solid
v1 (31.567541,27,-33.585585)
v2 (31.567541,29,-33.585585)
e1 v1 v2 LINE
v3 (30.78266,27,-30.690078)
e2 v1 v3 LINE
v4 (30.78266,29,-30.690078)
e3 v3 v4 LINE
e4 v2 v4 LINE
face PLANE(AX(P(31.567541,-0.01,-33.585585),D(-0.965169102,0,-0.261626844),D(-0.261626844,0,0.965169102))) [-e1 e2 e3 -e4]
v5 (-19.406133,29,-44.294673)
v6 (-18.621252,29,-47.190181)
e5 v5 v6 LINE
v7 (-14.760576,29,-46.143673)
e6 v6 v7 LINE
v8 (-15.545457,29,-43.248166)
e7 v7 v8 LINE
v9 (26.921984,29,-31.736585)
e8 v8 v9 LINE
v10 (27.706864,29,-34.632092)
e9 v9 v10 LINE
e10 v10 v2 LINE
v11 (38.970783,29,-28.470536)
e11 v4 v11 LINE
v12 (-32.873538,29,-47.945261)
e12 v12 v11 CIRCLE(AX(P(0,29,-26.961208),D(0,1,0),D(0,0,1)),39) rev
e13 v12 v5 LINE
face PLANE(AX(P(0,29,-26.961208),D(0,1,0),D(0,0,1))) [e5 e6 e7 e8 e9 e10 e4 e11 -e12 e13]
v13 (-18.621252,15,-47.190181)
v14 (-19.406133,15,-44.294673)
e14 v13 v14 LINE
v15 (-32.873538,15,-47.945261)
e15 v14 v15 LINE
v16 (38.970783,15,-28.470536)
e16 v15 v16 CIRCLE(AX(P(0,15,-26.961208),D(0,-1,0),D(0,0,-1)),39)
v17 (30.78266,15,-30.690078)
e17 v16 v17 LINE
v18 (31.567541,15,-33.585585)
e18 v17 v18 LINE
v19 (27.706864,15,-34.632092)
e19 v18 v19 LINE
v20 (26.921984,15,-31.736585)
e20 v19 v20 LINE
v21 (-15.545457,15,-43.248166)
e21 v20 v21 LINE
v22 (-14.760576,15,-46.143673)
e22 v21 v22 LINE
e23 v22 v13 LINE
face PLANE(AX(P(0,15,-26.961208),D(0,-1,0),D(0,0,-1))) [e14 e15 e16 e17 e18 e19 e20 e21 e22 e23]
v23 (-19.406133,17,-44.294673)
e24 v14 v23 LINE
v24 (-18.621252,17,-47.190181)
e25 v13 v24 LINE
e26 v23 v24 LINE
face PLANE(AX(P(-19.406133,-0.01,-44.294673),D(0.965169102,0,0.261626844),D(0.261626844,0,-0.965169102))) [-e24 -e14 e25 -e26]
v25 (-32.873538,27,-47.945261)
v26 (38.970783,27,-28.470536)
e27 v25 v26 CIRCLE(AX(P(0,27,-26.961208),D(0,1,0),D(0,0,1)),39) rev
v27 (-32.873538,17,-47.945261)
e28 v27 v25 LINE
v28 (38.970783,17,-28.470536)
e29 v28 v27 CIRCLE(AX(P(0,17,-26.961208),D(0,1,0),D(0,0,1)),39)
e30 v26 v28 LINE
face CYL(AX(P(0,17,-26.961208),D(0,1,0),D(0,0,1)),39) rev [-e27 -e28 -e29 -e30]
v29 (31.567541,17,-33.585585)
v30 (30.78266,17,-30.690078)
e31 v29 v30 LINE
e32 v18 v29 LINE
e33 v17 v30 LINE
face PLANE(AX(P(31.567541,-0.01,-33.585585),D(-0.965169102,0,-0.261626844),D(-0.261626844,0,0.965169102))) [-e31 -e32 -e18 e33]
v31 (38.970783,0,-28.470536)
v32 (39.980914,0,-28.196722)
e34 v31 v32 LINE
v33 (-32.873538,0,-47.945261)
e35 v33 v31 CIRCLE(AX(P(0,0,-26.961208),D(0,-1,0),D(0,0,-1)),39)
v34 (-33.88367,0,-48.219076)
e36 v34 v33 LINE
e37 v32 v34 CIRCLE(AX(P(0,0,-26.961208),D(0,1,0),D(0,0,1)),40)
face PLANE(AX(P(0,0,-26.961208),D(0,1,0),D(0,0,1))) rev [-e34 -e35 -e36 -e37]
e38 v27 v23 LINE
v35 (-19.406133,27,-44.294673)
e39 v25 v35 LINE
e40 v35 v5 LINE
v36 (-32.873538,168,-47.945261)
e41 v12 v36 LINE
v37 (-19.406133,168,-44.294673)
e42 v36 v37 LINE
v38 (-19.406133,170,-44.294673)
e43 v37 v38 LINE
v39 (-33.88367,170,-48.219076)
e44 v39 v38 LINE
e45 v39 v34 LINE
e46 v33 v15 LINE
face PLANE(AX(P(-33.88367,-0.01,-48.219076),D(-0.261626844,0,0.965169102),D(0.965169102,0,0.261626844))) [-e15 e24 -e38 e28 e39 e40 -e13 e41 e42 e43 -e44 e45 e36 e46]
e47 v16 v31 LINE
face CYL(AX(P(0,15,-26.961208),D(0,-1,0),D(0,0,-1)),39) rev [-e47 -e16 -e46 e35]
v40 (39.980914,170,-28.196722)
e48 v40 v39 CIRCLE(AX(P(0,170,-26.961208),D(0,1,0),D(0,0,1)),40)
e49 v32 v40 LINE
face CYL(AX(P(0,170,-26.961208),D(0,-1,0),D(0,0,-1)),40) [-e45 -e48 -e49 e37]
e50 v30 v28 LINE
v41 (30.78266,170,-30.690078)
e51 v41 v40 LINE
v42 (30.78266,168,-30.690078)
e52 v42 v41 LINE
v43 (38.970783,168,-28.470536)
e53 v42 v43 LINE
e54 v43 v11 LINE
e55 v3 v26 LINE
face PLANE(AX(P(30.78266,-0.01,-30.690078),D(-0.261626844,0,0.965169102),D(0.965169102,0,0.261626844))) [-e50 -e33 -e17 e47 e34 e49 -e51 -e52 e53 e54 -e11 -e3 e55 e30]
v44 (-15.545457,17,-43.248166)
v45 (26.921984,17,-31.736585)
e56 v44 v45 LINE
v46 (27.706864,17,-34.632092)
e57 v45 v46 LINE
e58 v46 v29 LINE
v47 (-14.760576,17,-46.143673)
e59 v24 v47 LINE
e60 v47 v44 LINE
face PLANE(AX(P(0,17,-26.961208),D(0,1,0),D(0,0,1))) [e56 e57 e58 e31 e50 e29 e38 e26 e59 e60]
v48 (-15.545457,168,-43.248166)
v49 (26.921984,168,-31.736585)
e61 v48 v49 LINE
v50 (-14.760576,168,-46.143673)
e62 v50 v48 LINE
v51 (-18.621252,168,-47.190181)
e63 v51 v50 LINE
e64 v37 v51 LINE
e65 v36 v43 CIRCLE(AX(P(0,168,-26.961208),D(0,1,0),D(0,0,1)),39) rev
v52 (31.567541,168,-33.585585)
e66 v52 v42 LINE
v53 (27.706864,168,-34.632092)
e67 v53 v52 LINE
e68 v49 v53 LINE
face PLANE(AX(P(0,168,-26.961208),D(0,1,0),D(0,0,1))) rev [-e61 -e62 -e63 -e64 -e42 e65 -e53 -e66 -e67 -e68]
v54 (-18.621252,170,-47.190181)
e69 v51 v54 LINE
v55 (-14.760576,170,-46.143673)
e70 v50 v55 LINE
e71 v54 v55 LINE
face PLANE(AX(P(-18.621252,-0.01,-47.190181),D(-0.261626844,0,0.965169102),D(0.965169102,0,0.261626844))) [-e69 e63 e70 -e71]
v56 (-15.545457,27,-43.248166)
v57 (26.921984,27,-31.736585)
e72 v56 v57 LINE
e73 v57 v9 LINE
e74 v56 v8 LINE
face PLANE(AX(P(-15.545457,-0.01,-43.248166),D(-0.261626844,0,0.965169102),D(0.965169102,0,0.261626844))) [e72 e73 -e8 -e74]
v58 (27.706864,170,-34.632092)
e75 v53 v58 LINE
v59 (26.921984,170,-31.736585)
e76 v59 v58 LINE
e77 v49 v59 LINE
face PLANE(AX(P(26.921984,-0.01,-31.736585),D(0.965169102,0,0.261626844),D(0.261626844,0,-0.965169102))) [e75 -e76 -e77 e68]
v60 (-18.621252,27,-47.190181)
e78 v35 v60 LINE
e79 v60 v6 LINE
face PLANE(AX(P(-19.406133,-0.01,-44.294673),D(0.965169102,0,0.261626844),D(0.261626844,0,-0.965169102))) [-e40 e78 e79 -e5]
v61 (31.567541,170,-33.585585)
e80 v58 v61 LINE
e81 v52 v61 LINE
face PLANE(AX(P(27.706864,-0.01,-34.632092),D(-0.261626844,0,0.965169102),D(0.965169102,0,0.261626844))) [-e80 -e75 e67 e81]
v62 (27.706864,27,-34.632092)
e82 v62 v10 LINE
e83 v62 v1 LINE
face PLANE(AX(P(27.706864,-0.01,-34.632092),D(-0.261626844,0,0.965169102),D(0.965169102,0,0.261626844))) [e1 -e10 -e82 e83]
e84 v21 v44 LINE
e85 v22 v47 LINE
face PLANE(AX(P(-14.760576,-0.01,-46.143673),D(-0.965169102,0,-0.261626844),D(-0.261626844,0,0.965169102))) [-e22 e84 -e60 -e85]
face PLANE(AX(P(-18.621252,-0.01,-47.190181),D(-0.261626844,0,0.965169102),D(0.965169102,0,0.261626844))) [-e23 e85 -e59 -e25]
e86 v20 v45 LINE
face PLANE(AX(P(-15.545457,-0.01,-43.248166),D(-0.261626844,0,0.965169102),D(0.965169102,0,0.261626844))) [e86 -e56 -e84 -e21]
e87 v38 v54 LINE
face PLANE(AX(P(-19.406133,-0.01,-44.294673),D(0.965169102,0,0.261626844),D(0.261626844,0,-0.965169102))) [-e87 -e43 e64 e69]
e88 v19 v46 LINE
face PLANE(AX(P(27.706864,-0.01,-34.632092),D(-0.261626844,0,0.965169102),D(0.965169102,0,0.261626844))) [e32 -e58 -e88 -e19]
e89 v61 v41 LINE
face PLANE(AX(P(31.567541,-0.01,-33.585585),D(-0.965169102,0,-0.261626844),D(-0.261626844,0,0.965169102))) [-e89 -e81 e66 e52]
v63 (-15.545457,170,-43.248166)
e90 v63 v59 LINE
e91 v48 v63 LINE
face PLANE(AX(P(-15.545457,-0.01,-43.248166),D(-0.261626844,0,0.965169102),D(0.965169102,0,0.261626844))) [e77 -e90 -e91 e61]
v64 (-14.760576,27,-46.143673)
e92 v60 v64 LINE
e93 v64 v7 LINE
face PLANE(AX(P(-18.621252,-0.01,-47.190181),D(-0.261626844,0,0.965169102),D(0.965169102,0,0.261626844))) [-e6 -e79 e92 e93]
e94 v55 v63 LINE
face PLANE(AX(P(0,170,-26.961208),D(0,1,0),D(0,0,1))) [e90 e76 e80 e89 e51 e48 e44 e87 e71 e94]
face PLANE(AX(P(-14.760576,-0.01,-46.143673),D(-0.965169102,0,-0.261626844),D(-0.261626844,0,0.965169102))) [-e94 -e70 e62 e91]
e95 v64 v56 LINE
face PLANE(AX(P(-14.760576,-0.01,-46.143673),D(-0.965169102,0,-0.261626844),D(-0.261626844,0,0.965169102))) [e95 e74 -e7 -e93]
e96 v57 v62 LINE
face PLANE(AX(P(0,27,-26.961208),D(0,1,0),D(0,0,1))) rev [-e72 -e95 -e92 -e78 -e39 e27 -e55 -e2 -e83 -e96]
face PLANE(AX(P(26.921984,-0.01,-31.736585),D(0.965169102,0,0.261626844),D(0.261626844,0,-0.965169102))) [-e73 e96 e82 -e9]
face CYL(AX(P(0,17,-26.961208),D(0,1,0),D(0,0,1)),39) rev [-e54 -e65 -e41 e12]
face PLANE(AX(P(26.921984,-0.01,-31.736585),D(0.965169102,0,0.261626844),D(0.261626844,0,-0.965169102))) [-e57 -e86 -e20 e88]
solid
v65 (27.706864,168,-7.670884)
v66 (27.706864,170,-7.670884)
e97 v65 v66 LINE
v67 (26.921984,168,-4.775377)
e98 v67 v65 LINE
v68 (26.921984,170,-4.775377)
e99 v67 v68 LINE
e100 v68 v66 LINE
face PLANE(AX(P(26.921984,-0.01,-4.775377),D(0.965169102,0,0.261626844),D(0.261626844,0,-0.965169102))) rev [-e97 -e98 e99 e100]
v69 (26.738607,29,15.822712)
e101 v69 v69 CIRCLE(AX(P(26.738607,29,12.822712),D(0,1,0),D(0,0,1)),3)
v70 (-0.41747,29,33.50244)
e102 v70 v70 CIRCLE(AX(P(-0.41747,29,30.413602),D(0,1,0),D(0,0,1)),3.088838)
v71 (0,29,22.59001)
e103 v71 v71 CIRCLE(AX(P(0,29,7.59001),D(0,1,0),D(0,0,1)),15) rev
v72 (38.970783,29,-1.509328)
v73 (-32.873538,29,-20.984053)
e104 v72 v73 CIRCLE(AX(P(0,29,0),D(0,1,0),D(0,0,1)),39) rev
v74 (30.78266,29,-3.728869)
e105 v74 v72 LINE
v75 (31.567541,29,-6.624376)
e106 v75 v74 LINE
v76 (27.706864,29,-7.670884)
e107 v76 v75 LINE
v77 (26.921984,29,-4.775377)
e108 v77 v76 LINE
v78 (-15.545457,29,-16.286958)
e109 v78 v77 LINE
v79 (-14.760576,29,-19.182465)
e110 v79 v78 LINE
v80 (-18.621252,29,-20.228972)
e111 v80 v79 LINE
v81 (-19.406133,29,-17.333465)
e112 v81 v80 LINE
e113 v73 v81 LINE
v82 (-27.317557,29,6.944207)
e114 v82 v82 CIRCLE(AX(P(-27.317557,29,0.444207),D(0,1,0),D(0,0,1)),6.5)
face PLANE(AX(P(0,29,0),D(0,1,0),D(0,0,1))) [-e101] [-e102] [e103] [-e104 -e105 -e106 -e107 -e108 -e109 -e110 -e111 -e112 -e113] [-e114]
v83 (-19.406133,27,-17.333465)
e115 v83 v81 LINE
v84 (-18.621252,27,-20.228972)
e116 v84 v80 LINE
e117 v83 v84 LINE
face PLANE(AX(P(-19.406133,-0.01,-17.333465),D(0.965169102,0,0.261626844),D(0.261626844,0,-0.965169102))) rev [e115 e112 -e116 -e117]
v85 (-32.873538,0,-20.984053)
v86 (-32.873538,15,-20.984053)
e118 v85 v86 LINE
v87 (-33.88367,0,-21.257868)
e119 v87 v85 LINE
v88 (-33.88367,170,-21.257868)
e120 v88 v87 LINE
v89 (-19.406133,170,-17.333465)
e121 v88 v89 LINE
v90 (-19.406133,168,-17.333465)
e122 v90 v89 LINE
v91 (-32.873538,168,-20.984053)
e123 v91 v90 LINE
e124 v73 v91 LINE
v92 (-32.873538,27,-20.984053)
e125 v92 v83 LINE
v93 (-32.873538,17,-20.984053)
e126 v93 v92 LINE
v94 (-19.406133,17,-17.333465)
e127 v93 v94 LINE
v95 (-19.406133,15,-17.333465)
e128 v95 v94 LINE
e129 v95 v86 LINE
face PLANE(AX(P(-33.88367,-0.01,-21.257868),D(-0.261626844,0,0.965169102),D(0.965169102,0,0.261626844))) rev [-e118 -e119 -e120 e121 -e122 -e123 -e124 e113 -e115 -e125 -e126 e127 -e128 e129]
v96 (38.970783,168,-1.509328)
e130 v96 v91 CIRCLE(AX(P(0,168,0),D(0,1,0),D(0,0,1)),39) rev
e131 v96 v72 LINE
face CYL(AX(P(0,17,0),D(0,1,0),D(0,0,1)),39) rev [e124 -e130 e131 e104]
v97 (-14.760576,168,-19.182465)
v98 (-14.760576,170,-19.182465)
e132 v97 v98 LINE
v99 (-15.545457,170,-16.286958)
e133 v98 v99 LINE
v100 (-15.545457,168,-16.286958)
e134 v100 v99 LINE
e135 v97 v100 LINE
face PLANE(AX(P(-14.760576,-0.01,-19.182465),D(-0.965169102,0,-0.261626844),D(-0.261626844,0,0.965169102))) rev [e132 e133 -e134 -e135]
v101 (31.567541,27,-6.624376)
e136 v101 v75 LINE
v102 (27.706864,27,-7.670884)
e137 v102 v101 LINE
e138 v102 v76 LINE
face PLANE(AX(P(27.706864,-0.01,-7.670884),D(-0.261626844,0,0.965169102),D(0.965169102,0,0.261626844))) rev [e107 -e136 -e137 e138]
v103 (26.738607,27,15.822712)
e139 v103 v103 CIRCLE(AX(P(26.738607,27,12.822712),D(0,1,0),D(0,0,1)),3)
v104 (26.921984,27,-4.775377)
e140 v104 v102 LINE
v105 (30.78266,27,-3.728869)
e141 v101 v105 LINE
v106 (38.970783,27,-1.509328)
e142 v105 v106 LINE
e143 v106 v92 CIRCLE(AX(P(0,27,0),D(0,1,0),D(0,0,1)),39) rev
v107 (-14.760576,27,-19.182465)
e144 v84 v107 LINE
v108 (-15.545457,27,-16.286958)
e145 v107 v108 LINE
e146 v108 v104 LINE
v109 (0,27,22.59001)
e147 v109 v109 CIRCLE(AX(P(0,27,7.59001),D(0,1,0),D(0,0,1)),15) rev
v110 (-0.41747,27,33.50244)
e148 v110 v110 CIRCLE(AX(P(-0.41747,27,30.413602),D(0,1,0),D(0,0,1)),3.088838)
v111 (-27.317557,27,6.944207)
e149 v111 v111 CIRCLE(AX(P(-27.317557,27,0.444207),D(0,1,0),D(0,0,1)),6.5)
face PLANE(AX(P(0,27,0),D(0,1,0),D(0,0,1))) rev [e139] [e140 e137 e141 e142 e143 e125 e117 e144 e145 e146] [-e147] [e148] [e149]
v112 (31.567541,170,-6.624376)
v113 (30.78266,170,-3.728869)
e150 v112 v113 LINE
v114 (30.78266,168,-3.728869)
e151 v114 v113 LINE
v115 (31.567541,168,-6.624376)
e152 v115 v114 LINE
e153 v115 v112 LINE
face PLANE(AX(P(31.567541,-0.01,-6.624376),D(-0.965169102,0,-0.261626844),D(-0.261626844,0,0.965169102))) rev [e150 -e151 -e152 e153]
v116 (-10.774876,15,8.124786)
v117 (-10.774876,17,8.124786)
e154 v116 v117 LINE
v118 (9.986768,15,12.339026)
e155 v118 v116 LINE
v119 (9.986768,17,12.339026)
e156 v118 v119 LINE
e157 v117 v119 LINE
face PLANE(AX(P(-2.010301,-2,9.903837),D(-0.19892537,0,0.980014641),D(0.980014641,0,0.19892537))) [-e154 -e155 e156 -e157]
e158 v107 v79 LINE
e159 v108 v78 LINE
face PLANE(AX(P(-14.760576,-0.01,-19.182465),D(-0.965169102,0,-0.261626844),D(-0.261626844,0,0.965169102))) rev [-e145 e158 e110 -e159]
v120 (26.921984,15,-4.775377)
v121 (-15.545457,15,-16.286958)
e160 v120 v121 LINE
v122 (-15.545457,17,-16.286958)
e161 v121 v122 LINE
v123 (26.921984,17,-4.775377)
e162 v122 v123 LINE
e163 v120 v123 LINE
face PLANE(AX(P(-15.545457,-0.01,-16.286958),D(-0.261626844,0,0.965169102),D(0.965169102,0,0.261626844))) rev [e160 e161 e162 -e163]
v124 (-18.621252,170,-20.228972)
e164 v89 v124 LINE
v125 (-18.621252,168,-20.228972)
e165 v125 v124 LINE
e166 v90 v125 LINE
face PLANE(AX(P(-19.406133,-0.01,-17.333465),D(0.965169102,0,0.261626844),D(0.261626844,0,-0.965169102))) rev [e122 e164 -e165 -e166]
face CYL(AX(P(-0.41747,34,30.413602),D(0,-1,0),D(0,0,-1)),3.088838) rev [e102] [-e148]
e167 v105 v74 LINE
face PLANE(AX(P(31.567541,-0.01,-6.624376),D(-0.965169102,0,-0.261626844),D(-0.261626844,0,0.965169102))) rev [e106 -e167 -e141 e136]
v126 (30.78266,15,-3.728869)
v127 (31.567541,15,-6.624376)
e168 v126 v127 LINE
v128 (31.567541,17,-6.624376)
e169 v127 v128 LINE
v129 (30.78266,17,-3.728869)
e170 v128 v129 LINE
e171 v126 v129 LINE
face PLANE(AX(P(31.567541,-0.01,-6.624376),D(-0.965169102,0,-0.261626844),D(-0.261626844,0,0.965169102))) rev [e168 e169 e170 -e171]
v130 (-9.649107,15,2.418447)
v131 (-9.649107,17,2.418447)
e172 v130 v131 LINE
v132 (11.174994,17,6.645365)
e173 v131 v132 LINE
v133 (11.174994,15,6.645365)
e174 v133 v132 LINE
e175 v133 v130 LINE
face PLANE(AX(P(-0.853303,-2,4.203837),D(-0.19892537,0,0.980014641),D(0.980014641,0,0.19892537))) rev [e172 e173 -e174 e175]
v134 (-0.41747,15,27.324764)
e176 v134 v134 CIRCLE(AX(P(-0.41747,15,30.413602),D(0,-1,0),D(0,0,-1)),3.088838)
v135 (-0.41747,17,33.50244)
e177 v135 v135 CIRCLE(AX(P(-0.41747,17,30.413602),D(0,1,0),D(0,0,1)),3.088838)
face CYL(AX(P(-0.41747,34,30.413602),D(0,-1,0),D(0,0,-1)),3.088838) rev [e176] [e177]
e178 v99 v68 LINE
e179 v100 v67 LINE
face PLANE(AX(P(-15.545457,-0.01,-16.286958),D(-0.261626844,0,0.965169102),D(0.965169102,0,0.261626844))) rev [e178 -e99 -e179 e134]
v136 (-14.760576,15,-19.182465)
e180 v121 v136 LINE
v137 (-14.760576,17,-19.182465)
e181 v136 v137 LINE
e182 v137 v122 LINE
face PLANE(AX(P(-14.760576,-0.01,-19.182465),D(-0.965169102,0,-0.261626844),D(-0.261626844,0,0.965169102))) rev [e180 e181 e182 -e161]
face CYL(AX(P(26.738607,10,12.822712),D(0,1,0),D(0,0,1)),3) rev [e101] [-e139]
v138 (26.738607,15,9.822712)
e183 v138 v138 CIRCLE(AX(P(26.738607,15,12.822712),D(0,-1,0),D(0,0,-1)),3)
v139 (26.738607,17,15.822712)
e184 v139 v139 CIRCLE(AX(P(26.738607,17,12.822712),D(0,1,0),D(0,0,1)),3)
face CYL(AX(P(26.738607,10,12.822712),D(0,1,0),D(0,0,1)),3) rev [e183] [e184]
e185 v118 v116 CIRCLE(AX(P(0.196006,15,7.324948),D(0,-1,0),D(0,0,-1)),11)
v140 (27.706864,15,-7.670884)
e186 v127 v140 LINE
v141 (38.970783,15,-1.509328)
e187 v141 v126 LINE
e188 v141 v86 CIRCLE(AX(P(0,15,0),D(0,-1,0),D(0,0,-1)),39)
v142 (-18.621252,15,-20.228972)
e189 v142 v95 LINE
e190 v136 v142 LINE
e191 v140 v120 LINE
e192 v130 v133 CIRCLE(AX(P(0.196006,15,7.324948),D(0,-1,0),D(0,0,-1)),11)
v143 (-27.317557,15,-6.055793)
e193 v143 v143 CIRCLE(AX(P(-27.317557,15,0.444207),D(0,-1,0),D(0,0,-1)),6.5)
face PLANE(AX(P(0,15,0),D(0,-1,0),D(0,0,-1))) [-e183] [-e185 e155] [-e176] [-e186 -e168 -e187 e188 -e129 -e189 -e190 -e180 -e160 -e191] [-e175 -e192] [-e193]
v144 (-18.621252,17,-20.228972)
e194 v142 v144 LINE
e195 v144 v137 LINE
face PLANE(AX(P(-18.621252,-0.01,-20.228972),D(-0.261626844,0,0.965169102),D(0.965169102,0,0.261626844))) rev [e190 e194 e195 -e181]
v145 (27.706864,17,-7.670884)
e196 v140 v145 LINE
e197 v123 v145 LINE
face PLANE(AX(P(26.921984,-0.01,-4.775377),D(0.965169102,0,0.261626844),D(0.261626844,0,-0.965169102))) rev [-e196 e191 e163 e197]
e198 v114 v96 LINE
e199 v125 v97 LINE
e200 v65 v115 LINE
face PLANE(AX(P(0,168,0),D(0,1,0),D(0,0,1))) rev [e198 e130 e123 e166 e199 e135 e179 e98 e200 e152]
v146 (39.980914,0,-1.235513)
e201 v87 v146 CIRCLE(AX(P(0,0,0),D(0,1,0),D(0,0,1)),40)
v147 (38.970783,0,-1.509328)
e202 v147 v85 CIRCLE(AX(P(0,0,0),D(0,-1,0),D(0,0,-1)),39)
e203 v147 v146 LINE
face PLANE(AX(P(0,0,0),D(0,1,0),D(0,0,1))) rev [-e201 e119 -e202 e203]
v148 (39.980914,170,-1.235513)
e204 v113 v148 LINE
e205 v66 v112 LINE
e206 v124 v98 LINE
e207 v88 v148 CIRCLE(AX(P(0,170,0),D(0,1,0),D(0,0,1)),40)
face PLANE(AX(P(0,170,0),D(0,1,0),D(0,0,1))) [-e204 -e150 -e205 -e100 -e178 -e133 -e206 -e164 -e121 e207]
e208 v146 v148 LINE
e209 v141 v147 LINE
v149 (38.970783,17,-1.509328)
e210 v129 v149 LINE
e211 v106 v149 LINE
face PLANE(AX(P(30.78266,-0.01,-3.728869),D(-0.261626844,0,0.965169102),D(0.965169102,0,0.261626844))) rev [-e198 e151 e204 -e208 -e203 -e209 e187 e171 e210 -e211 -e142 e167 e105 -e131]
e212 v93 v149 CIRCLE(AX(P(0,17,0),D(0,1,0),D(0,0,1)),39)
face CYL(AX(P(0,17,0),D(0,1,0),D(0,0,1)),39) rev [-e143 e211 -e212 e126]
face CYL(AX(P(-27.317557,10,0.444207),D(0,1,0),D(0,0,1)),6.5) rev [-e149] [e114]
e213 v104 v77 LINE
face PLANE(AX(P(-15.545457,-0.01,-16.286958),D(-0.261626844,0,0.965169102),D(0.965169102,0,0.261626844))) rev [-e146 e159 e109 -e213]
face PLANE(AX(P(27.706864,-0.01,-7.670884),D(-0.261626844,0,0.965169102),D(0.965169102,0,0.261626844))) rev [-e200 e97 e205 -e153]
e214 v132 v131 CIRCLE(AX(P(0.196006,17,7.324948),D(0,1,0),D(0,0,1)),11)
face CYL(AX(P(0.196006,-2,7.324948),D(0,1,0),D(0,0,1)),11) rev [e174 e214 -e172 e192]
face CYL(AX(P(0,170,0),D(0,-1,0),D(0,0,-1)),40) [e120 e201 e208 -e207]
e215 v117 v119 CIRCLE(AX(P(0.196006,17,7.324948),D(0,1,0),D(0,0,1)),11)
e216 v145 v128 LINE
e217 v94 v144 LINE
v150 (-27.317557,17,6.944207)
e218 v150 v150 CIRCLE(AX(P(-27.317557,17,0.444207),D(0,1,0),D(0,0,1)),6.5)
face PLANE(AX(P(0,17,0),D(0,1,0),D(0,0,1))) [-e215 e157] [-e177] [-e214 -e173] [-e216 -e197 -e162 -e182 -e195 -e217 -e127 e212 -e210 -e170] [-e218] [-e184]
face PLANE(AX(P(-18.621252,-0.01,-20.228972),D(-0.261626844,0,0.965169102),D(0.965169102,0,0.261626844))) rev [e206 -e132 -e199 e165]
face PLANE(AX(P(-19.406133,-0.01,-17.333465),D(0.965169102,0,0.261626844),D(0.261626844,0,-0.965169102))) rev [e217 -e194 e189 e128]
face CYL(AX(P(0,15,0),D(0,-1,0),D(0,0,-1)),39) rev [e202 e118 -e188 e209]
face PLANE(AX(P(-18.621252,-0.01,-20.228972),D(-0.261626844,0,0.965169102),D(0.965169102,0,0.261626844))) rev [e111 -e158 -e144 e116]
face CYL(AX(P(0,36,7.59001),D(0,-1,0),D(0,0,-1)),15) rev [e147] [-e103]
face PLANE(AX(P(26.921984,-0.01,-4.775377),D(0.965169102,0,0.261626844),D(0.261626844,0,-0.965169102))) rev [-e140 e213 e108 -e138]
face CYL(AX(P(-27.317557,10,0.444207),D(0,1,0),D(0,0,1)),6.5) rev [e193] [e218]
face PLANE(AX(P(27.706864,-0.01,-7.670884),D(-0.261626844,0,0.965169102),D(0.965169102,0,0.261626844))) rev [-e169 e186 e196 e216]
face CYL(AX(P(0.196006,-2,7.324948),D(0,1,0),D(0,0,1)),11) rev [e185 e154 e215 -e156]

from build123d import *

# Parameters (mm, degrees)
SKETCH1_R               = 40
BOSS_EXTRUDE1_DEPTH     = 170
SKETCH3_R               = 39
CUT_EXTRUDE1_DEPTH      = 153
CUT_EXTRUDE2_START      = -15
SKETCH5_R               = 39
CUT_EXTRUDE2_DEPTH      = 15
SKETCH6_R               = 40
BOSS_EXTRUDE2_DEPTH     = 2
SKETCH12_R              = 15
CUT_EXTRUDE5_DEPTH      = 19
CUT_EXTRUDE6_DEPTH      = 19
SKETCH16_R              = 3.088837779
CUT_EXTRUDE7_DEPTH      = 19
SKETCH17_R              = 3
CUT_EXTRUDE8_DEPTH      = 19
SKETCH18_R              = 6.5
CUT_EXTRUDE9_DEPTH      = 19
BOSS_EXTRUDE3_START     = -2
SKETCH19_R              = 40
BOSS_EXTRUDE3_DEPTH     = 2
SPLIT1_SURFACE_1_BACK   = 205.206
SPLIT1_SURFACE_1_DEPTH  = 410.412
SPLIT1_SURFACE_2_BACK   = 205.206
SPLIT1_SURFACE_2_DEPTH  = 410.412
BODY_MOVE_COPY1_DEPTH   = 170
BODY_MOVE_COPY1_START   = 29
BODY_MOVE_COPY1_2_DEPTH = 139
BODY_MOVE_COPY1_3_DEPTH = 15
BODY_MOVE_COPY1_START_2 = 17
BODY_MOVE_COPY1_4_DEPTH = 10
BODY_MOVE_COPY1_5_DEPTH = 170
BODY_MOVE_COPY1_START_3 = 15
BODY_MOVE_COPY1_6_DEPTH = 2
BODY_MOVE_COPY1_START_4 = 27
BODY_MOVE_COPY1_7_DEPTH = 2
BODY_MOVE_COPY1_START_5 = 168
BODY_MOVE_COPY1_8_DEPTH = 2


# Read off the part's stored shape, not the designer's step: Body-Move/Copy1
with BuildPart() as part:
    # Sketch1 → Boss-Extrude1 (new body)
    with BuildSketch(Plane(origin=(0, 0, 0), x_dir=(1, 0, 0), z_dir=(0, 1, 0))):
        with Locations(Location((0, 0, 0), (0, 0, 270))):
            Circle(SKETCH1_R)
    extrude(amount=BOSS_EXTRUDE1_DEPTH)

    # Sketch3 → Cut-Extrude1 (cut)
    with BuildSketch(Plane(origin=(0, 170, 0), x_dir=(1, 0, 0), z_dir=(0, 1, 0))):
        with Locations(Location((0, 0, 0), (0, 0, 270))):
            Circle(SKETCH3_R)
    extrude(amount=-CUT_EXTRUDE1_DEPTH, mode=Mode.SUBTRACT)

    # Sketch5 → Cut-Extrude2 (cut)
    with BuildSketch(Plane.XZ.offset(CUT_EXTRUDE2_START)):
        with Locations(Location((0, 0, 0), (0, 0, 90))):
            Circle(SKETCH5_R)
    extrude(amount=CUT_EXTRUDE2_DEPTH, mode=Mode.SUBTRACT)

    # Sketch6 → Boss-Extrude2 (add)
    with BuildSketch(Plane(origin=(0, 27, 0), x_dir=(1, 0, 0), z_dir=(0, 1, 0))):
        with Locations(Location((0, 0, 0), (0, 0, 270))):
            Circle(SKETCH6_R)
    extrude(amount=BOSS_EXTRUDE2_DEPTH)

    # Sketch12 → Cut-Extrude5 (cut)
    with BuildSketch(Plane(origin=(0, 17, 0), x_dir=(1, 0, 0), z_dir=(0, 1, 0))):
        with Locations(Location((0, -7.590009818, 0), (0, 0, 270))):
            Circle(SKETCH12_R)
    extrude(amount=CUT_EXTRUDE5_DEPTH, mode=Mode.SUBTRACT)

    # Sketch15 → Cut-Extrude6 (cut)
    with BuildSketch(Plane(origin=(0, 17, 0), x_dir=(1, 0, 0), z_dir=(0, 1, 0))):
        with BuildLine():
            ThreePointArc((11.174993965, -6.645365205), (2.384185489, 3.45521331), (-9.64910652, -2.418446828))
            Line((-9.64910652, -2.418446828), (11.174993965, -6.645365205))
        make_face()
        with BuildLine():
            Line((9.986768127, -12.339026438), (-10.774875926, -8.124785595))
            ThreePointArc((-10.774875926, -8.124785595), (-1.992172654, -18.105108798), (9.986768127, -12.339026438))
        make_face()
    extrude(amount=-CUT_EXTRUDE6_DEPTH, mode=Mode.SUBTRACT)

    # Sketch16 → Cut-Extrude7 (cut)
    with BuildSketch(Plane.XZ.offset(-15)):
        with Locations(Location((-0.417469766, 30.413602278, 0), (0, 0, 90))):
            Circle(SKETCH16_R)
    extrude(amount=-CUT_EXTRUDE7_DEPTH, mode=Mode.SUBTRACT)

    # Sketch17 → Cut-Extrude8 (cut)
    with BuildSketch(Plane(origin=(0, 29, 0), x_dir=(1, 0, 0), z_dir=(0, 1, 0))):
        with Locations(Location((26.738607031, -12.822711748, 0), (0, 0, 270))):
            Circle(SKETCH17_R)
    extrude(amount=-CUT_EXTRUDE8_DEPTH, mode=Mode.SUBTRACT)

    # Sketch18 → Cut-Extrude9 (cut)
    with BuildSketch(Plane(origin=(0, 29, 0), x_dir=(1, 0, 0), z_dir=(0, 1, 0))):
        with Locations(Location((-27.317556841, -0.444207085, 0), (0, 0, 270))):
            Circle(SKETCH18_R)
    extrude(amount=-CUT_EXTRUDE9_DEPTH, mode=Mode.SUBTRACT)

    # Sketch19 → Boss-Extrude3 (add)
    with BuildSketch(Plane(origin=(0, 170, 0), x_dir=(1, 0, 0), z_dir=(0, 1, 0)).offset(BOSS_EXTRUDE3_START)):
        with Locations(Location((0, 0, 0), (0, 0, 270))):
            Circle(SKETCH19_R)
    extrude(amount=BOSS_EXTRUDE3_DEPTH)


with BuildPart() as body_2:
    # Split1: the piece behind the surface
    add(part.part)
    # Split1 surface: a surface, the sketch's curves swept straight by 410.412 mm
    with BuildLine(Plane(origin=(0, 170, 0), x_dir=(1, 0, 0), z_dir=(0, 1, 0)).offset(-SPLIT1_SURFACE_1_BACK), mode=Mode.PRIVATE) as split1_surface_1_path:
        Line((-33.883669555, 21.257867661), (-19.406133031, 17.333465005))
        Line((-19.406133031, 17.333465005), (-18.6212525, 20.22897231))
        Line((-18.6212525, 20.22897231), (-14.760576094, 19.182464935))
        Line((-14.760576094, 19.182464935), (-15.545456625, 16.28695763))
        Line((-15.545456625, 16.28695763), (26.921983844, 4.775376504))
        Line((26.921983844, 4.775376504), (27.706864375, 7.670883809))
        Line((27.706864375, 7.670883809), (31.567540782, 6.624376434))
        Line((31.567540782, 6.624376434), (30.78266025, 3.728869129))
        Line((30.78266025, 3.728869129), (45.260196774, -0.195533527))
    split1_surface_1 = Shell.extrude(split1_surface_1_path.wire(), (0 * SPLIT1_SURFACE_1_DEPTH, 1 * SPLIT1_SURFACE_1_DEPTH, 0 * SPLIT1_SURFACE_1_DEPTH))
    split(bisect_by=split1_surface_1, keep=Keep.BOTTOM)


with BuildPart() as part_1:
    add(part.part)

    # Split1: split by a surface, the side it looks to stays
    # Split1 surface: a surface, the sketch's curves swept straight by 410.412 mm
    with BuildLine(Plane(origin=(0, 170, 0), x_dir=(1, 0, 0), z_dir=(0, 1, 0)).offset(-SPLIT1_SURFACE_2_BACK), mode=Mode.PRIVATE) as split1_surface_2_path:
        Line((-33.883669555, 21.257867661), (-19.406133031, 17.333465005))
        Line((-19.406133031, 17.333465005), (-18.6212525, 20.22897231))
        Line((-18.6212525, 20.22897231), (-14.760576094, 19.182464935))
        Line((-14.760576094, 19.182464935), (-15.545456625, 16.28695763))
        Line((-15.545456625, 16.28695763), (26.921983844, 4.775376504))
        Line((26.921983844, 4.775376504), (27.706864375, 7.670883809))
        Line((27.706864375, 7.670883809), (31.567540782, 6.624376434))
        Line((31.567540782, 6.624376434), (30.78266025, 3.728869129))
        Line((30.78266025, 3.728869129), (45.260196774, -0.195533527))
    split1_surface_2 = Shell.extrude(split1_surface_2_path.wire(), (0 * SPLIT1_SURFACE_2_DEPTH, 1 * SPLIT1_SURFACE_2_DEPTH, 0 * SPLIT1_SURFACE_2_DEPTH))
    split(bisect_by=split1_surface_2, keep=Keep.TOP)

    # Body-Move/Copy1 outline → Body-Move/Copy1 (cut)
    with BuildSketch(Plane(origin=(0, 0, 0), x_dir=(1, 0, 0), z_dir=(0, 1, 0))):
        with BuildLine():
            ThreePointArc((39.980914288, 1.235513127), (35.157526041, 19.077430715), (22.828025818, 32.846327607))
            Line((22.828025818, 32.846327607), (-3.114608044, 39.878555851))
            ThreePointArc((-3.114608044, 39.878555851), (-20.70991655, 34.221328971), (-33.883669555, 21.257867661))
            Line((-33.883669555, 21.257867661), (-19.406133031, 17.333465005))
            Line((-19.406133031, 17.333465005), (-18.6212525, 20.22897231))
            Line((-18.6212525, 20.22897231), (-14.760576094, 19.182464935))
            Line((-14.760576094, 19.182464935), (-15.545456625, 16.28695763))
            Line((-15.545456625, 16.28695763), (26.921983844, 4.775376504))
            Line((26.921983844, 4.775376504), (27.706864375, 7.670883809))
            Line((27.706864375, 7.670883809), (31.567540782, 6.624376434))
            Line((31.567540782, 6.624376434), (30.78266025, 3.728869129))
            Line((30.78266025, 3.728869129), (39.980914288, 1.235513127))
        make_face()
    extrude(amount=BODY_MOVE_COPY1_DEPTH, mode=Mode.SUBTRACT)

    # Body-Move_Copy1 2 outline → Body-Move_Copy1 2 (cut)
    with BuildSketch(Plane(origin=(0, 0, 0), x_dir=(1, 0, 0), z_dir=(0, 1, 0)).offset(BODY_MOVE_COPY1_START)):
        with BuildLine():
            Line((19.586174582, 33.725091034), (22.828025818, 32.846327607))
            ThreePointArc((22.828025818, 32.846327607), (10.46507375, 38.606764063), (-3.114608044, 39.878555851))
            Line((-3.114608044, 39.878555851), (0.127243191, 38.999792425))
            ThreePointArc((0.127243191, 38.999792425), (10.203446906, 37.641594961), (19.586174582, 33.725091034))
        make_face()
    extrude(amount=BODY_MOVE_COPY1_2_DEPTH, mode=Mode.SUBTRACT)

    # Body-Move_Copy1 3 outline → Body-Move_Copy1 3 (cut)
    with BuildSketch(Plane(origin=(0, 0, 0), x_dir=(1, 0, 0), z_dir=(0, 1, 0))):
        with BuildLine():
            Line((19.586174582, 33.725091034), (22.828025818, 32.846327607))
            ThreePointArc((22.828025818, 32.846327607), (10.46507375, 38.606764063), (-3.114608044, 39.878555851))
            Line((-3.114608044, 39.878555851), (0.127243191, 38.999792425))
            ThreePointArc((0.127243191, 38.999792425), (10.203446906, 37.641594961), (19.586174582, 33.725091034))
        make_face()
    extrude(amount=BODY_MOVE_COPY1_3_DEPTH, mode=Mode.SUBTRACT)

    # Body-Move_Copy1 4 outline → Body-Move_Copy1 4 (cut)
    with BuildSketch(Plane(origin=(0, 0, 0), x_dir=(1, 0, 0), z_dir=(0, 1, 0)).offset(BODY_MOVE_COPY1_START_2)):
        with BuildLine():
            Line((19.586174582, 33.725091034), (22.828025818, 32.846327607))
            ThreePointArc((22.828025818, 32.846327607), (10.46507375, 38.606764063), (-3.114608044, 39.878555851))
            Line((-3.114608044, 39.878555851), (0.127243191, 38.999792425))
            ThreePointArc((0.127243191, 38.999792425), (10.203446906, 37.641594961), (19.586174582, 33.725091034))
        make_face()
    extrude(amount=BODY_MOVE_COPY1_4_DEPTH, mode=Mode.SUBTRACT)



with BuildPart() as body_3:
    # Body-Move_Copy1 5 outline → Body-Move_Copy1 5 (new body)
    with BuildSketch(Plane(origin=(0, 0, 0), x_dir=(1, 0, 0), z_dir=(0, 1, 0))):
        with BuildLine():
            ThreePointArc((-32.873538292, 47.945261449), (10.203446907, 64.602803414), (38.970783025, 28.470536245))
            Line((38.970783025, 28.470536245), (39.980914288, 28.19672158))
            ThreePointArc((39.980914288, 28.19672158), (10.46507375, 65.567972515), (-33.883669555, 48.219076114))
            Line((-33.883669555, 48.219076114), (-32.873538292, 47.945261449))
        make_face()
    extrude(amount=BODY_MOVE_COPY1_5_DEPTH)


with BuildPart() as part_2:
    add(part_1.part)

    add(body_3.part)  # Body-Move_Copy1 6 merges body 3
    # Body-Move_Copy1 6 outline → Body-Move_Copy1 6 (add)
    with BuildSketch(Plane(origin=(0, 0, 0), x_dir=(1, 0, 0), z_dir=(0, 1, 0)).offset(BODY_MOVE_COPY1_START_3)):
        with BuildLine():
            Line((31.567540782, 33.585584886), (30.78266025, 30.690077582))
            Line((30.78266025, 30.690077582), (38.970783025, 28.470536245))
            ThreePointArc((38.970783025, 28.470536245), (10.203446907, 64.602803414), (-32.873538292, 47.945261449))
            Line((-32.873538292, 47.945261449), (-19.406133031, 44.294673457))
            Line((-19.406133031, 44.294673457), (-18.6212525, 47.190180762))
            Line((-18.6212525, 47.190180762), (-14.760576094, 46.143673387))
            Line((-14.760576094, 46.143673387), (-15.545456625, 43.248166082))
            Line((-15.545456625, 43.248166082), (-3.114608044, 39.878555851))
            ThreePointArc((-3.114608044, 39.878555851), (10.46507375, 38.606764063), (22.828025818, 32.846327607))
            Line((22.828025818, 32.846327607), (26.921983844, 31.736584957))
            Line((26.921983844, 31.736584957), (27.706864375, 34.632092261))
            Line((27.706864375, 34.632092261), (31.567540782, 33.585584886))
        make_face()
    extrude(amount=BODY_MOVE_COPY1_6_DEPTH)

    # Body-Move_Copy1 7 outline → Body-Move_Copy1 7 (add)
    with BuildSketch(Plane(origin=(0, 0, 0), x_dir=(1, 0, 0), z_dir=(0, 1, 0)).offset(BODY_MOVE_COPY1_START_4)):
        with BuildLine():
            Line((31.567540782, 33.585584886), (30.78266025, 30.690077582))
            Line((30.78266025, 30.690077582), (38.970783025, 28.470536245))
            ThreePointArc((38.970783025, 28.470536245), (10.203446907, 64.602803414), (-32.873538292, 47.945261449))
            Line((-32.873538292, 47.945261449), (-19.406133031, 44.294673457))
            Line((-19.406133031, 44.294673457), (-18.6212525, 47.190180762))
            Line((-18.6212525, 47.190180762), (-14.760576094, 46.143673387))
            Line((-14.760576094, 46.143673387), (-15.545456625, 43.248166082))
            Line((-15.545456625, 43.248166082), (-3.114608044, 39.878555851))
            ThreePointArc((-3.114608044, 39.878555851), (10.46507375, 38.606764063), (22.828025818, 32.846327607))
            Line((22.828025818, 32.846327607), (26.921983844, 31.736584957))
            Line((26.921983844, 31.736584957), (27.706864375, 34.632092261))
            Line((27.706864375, 34.632092261), (31.567540782, 33.585584886))
        make_face()
    extrude(amount=BODY_MOVE_COPY1_7_DEPTH)

    # Body-Move_Copy1 8 outline → Body-Move_Copy1 8 (add)
    with BuildSketch(Plane(origin=(0, 0, 0), x_dir=(1, 0, 0), z_dir=(0, 1, 0)).offset(BODY_MOVE_COPY1_START_5)):
        with BuildLine():
            Line((31.567540782, 33.585584886), (30.78266025, 30.690077582))
            Line((30.78266025, 30.690077582), (38.970783025, 28.470536245))
            ThreePointArc((38.970783025, 28.470536245), (10.203446907, 64.602803414), (-32.873538292, 47.945261449))
            Line((-32.873538292, 47.945261449), (-19.406133031, 44.294673457))
            Line((-19.406133031, 44.294673457), (-18.6212525, 47.190180762))
            Line((-18.6212525, 47.190180762), (-14.760576094, 46.143673387))
            Line((-14.760576094, 46.143673387), (-15.545456625, 43.248166082))
            Line((-15.545456625, 43.248166082), (-3.114608044, 39.878555851))
            ThreePointArc((-3.114608044, 39.878555851), (10.46507375, 38.606764063), (22.828025818, 32.846327607))
            Line((22.828025818, 32.846327607), (26.921983844, 31.736584957))
            Line((26.921983844, 31.736584957), (27.706864375, 34.632092261))
            Line((27.706864375, 34.632092261), (31.567540782, 33.585584886))
        make_face()
    extrude(amount=BODY_MOVE_COPY1_8_DEPTH)


solid = Compound([body_2.part, part_2.part])
